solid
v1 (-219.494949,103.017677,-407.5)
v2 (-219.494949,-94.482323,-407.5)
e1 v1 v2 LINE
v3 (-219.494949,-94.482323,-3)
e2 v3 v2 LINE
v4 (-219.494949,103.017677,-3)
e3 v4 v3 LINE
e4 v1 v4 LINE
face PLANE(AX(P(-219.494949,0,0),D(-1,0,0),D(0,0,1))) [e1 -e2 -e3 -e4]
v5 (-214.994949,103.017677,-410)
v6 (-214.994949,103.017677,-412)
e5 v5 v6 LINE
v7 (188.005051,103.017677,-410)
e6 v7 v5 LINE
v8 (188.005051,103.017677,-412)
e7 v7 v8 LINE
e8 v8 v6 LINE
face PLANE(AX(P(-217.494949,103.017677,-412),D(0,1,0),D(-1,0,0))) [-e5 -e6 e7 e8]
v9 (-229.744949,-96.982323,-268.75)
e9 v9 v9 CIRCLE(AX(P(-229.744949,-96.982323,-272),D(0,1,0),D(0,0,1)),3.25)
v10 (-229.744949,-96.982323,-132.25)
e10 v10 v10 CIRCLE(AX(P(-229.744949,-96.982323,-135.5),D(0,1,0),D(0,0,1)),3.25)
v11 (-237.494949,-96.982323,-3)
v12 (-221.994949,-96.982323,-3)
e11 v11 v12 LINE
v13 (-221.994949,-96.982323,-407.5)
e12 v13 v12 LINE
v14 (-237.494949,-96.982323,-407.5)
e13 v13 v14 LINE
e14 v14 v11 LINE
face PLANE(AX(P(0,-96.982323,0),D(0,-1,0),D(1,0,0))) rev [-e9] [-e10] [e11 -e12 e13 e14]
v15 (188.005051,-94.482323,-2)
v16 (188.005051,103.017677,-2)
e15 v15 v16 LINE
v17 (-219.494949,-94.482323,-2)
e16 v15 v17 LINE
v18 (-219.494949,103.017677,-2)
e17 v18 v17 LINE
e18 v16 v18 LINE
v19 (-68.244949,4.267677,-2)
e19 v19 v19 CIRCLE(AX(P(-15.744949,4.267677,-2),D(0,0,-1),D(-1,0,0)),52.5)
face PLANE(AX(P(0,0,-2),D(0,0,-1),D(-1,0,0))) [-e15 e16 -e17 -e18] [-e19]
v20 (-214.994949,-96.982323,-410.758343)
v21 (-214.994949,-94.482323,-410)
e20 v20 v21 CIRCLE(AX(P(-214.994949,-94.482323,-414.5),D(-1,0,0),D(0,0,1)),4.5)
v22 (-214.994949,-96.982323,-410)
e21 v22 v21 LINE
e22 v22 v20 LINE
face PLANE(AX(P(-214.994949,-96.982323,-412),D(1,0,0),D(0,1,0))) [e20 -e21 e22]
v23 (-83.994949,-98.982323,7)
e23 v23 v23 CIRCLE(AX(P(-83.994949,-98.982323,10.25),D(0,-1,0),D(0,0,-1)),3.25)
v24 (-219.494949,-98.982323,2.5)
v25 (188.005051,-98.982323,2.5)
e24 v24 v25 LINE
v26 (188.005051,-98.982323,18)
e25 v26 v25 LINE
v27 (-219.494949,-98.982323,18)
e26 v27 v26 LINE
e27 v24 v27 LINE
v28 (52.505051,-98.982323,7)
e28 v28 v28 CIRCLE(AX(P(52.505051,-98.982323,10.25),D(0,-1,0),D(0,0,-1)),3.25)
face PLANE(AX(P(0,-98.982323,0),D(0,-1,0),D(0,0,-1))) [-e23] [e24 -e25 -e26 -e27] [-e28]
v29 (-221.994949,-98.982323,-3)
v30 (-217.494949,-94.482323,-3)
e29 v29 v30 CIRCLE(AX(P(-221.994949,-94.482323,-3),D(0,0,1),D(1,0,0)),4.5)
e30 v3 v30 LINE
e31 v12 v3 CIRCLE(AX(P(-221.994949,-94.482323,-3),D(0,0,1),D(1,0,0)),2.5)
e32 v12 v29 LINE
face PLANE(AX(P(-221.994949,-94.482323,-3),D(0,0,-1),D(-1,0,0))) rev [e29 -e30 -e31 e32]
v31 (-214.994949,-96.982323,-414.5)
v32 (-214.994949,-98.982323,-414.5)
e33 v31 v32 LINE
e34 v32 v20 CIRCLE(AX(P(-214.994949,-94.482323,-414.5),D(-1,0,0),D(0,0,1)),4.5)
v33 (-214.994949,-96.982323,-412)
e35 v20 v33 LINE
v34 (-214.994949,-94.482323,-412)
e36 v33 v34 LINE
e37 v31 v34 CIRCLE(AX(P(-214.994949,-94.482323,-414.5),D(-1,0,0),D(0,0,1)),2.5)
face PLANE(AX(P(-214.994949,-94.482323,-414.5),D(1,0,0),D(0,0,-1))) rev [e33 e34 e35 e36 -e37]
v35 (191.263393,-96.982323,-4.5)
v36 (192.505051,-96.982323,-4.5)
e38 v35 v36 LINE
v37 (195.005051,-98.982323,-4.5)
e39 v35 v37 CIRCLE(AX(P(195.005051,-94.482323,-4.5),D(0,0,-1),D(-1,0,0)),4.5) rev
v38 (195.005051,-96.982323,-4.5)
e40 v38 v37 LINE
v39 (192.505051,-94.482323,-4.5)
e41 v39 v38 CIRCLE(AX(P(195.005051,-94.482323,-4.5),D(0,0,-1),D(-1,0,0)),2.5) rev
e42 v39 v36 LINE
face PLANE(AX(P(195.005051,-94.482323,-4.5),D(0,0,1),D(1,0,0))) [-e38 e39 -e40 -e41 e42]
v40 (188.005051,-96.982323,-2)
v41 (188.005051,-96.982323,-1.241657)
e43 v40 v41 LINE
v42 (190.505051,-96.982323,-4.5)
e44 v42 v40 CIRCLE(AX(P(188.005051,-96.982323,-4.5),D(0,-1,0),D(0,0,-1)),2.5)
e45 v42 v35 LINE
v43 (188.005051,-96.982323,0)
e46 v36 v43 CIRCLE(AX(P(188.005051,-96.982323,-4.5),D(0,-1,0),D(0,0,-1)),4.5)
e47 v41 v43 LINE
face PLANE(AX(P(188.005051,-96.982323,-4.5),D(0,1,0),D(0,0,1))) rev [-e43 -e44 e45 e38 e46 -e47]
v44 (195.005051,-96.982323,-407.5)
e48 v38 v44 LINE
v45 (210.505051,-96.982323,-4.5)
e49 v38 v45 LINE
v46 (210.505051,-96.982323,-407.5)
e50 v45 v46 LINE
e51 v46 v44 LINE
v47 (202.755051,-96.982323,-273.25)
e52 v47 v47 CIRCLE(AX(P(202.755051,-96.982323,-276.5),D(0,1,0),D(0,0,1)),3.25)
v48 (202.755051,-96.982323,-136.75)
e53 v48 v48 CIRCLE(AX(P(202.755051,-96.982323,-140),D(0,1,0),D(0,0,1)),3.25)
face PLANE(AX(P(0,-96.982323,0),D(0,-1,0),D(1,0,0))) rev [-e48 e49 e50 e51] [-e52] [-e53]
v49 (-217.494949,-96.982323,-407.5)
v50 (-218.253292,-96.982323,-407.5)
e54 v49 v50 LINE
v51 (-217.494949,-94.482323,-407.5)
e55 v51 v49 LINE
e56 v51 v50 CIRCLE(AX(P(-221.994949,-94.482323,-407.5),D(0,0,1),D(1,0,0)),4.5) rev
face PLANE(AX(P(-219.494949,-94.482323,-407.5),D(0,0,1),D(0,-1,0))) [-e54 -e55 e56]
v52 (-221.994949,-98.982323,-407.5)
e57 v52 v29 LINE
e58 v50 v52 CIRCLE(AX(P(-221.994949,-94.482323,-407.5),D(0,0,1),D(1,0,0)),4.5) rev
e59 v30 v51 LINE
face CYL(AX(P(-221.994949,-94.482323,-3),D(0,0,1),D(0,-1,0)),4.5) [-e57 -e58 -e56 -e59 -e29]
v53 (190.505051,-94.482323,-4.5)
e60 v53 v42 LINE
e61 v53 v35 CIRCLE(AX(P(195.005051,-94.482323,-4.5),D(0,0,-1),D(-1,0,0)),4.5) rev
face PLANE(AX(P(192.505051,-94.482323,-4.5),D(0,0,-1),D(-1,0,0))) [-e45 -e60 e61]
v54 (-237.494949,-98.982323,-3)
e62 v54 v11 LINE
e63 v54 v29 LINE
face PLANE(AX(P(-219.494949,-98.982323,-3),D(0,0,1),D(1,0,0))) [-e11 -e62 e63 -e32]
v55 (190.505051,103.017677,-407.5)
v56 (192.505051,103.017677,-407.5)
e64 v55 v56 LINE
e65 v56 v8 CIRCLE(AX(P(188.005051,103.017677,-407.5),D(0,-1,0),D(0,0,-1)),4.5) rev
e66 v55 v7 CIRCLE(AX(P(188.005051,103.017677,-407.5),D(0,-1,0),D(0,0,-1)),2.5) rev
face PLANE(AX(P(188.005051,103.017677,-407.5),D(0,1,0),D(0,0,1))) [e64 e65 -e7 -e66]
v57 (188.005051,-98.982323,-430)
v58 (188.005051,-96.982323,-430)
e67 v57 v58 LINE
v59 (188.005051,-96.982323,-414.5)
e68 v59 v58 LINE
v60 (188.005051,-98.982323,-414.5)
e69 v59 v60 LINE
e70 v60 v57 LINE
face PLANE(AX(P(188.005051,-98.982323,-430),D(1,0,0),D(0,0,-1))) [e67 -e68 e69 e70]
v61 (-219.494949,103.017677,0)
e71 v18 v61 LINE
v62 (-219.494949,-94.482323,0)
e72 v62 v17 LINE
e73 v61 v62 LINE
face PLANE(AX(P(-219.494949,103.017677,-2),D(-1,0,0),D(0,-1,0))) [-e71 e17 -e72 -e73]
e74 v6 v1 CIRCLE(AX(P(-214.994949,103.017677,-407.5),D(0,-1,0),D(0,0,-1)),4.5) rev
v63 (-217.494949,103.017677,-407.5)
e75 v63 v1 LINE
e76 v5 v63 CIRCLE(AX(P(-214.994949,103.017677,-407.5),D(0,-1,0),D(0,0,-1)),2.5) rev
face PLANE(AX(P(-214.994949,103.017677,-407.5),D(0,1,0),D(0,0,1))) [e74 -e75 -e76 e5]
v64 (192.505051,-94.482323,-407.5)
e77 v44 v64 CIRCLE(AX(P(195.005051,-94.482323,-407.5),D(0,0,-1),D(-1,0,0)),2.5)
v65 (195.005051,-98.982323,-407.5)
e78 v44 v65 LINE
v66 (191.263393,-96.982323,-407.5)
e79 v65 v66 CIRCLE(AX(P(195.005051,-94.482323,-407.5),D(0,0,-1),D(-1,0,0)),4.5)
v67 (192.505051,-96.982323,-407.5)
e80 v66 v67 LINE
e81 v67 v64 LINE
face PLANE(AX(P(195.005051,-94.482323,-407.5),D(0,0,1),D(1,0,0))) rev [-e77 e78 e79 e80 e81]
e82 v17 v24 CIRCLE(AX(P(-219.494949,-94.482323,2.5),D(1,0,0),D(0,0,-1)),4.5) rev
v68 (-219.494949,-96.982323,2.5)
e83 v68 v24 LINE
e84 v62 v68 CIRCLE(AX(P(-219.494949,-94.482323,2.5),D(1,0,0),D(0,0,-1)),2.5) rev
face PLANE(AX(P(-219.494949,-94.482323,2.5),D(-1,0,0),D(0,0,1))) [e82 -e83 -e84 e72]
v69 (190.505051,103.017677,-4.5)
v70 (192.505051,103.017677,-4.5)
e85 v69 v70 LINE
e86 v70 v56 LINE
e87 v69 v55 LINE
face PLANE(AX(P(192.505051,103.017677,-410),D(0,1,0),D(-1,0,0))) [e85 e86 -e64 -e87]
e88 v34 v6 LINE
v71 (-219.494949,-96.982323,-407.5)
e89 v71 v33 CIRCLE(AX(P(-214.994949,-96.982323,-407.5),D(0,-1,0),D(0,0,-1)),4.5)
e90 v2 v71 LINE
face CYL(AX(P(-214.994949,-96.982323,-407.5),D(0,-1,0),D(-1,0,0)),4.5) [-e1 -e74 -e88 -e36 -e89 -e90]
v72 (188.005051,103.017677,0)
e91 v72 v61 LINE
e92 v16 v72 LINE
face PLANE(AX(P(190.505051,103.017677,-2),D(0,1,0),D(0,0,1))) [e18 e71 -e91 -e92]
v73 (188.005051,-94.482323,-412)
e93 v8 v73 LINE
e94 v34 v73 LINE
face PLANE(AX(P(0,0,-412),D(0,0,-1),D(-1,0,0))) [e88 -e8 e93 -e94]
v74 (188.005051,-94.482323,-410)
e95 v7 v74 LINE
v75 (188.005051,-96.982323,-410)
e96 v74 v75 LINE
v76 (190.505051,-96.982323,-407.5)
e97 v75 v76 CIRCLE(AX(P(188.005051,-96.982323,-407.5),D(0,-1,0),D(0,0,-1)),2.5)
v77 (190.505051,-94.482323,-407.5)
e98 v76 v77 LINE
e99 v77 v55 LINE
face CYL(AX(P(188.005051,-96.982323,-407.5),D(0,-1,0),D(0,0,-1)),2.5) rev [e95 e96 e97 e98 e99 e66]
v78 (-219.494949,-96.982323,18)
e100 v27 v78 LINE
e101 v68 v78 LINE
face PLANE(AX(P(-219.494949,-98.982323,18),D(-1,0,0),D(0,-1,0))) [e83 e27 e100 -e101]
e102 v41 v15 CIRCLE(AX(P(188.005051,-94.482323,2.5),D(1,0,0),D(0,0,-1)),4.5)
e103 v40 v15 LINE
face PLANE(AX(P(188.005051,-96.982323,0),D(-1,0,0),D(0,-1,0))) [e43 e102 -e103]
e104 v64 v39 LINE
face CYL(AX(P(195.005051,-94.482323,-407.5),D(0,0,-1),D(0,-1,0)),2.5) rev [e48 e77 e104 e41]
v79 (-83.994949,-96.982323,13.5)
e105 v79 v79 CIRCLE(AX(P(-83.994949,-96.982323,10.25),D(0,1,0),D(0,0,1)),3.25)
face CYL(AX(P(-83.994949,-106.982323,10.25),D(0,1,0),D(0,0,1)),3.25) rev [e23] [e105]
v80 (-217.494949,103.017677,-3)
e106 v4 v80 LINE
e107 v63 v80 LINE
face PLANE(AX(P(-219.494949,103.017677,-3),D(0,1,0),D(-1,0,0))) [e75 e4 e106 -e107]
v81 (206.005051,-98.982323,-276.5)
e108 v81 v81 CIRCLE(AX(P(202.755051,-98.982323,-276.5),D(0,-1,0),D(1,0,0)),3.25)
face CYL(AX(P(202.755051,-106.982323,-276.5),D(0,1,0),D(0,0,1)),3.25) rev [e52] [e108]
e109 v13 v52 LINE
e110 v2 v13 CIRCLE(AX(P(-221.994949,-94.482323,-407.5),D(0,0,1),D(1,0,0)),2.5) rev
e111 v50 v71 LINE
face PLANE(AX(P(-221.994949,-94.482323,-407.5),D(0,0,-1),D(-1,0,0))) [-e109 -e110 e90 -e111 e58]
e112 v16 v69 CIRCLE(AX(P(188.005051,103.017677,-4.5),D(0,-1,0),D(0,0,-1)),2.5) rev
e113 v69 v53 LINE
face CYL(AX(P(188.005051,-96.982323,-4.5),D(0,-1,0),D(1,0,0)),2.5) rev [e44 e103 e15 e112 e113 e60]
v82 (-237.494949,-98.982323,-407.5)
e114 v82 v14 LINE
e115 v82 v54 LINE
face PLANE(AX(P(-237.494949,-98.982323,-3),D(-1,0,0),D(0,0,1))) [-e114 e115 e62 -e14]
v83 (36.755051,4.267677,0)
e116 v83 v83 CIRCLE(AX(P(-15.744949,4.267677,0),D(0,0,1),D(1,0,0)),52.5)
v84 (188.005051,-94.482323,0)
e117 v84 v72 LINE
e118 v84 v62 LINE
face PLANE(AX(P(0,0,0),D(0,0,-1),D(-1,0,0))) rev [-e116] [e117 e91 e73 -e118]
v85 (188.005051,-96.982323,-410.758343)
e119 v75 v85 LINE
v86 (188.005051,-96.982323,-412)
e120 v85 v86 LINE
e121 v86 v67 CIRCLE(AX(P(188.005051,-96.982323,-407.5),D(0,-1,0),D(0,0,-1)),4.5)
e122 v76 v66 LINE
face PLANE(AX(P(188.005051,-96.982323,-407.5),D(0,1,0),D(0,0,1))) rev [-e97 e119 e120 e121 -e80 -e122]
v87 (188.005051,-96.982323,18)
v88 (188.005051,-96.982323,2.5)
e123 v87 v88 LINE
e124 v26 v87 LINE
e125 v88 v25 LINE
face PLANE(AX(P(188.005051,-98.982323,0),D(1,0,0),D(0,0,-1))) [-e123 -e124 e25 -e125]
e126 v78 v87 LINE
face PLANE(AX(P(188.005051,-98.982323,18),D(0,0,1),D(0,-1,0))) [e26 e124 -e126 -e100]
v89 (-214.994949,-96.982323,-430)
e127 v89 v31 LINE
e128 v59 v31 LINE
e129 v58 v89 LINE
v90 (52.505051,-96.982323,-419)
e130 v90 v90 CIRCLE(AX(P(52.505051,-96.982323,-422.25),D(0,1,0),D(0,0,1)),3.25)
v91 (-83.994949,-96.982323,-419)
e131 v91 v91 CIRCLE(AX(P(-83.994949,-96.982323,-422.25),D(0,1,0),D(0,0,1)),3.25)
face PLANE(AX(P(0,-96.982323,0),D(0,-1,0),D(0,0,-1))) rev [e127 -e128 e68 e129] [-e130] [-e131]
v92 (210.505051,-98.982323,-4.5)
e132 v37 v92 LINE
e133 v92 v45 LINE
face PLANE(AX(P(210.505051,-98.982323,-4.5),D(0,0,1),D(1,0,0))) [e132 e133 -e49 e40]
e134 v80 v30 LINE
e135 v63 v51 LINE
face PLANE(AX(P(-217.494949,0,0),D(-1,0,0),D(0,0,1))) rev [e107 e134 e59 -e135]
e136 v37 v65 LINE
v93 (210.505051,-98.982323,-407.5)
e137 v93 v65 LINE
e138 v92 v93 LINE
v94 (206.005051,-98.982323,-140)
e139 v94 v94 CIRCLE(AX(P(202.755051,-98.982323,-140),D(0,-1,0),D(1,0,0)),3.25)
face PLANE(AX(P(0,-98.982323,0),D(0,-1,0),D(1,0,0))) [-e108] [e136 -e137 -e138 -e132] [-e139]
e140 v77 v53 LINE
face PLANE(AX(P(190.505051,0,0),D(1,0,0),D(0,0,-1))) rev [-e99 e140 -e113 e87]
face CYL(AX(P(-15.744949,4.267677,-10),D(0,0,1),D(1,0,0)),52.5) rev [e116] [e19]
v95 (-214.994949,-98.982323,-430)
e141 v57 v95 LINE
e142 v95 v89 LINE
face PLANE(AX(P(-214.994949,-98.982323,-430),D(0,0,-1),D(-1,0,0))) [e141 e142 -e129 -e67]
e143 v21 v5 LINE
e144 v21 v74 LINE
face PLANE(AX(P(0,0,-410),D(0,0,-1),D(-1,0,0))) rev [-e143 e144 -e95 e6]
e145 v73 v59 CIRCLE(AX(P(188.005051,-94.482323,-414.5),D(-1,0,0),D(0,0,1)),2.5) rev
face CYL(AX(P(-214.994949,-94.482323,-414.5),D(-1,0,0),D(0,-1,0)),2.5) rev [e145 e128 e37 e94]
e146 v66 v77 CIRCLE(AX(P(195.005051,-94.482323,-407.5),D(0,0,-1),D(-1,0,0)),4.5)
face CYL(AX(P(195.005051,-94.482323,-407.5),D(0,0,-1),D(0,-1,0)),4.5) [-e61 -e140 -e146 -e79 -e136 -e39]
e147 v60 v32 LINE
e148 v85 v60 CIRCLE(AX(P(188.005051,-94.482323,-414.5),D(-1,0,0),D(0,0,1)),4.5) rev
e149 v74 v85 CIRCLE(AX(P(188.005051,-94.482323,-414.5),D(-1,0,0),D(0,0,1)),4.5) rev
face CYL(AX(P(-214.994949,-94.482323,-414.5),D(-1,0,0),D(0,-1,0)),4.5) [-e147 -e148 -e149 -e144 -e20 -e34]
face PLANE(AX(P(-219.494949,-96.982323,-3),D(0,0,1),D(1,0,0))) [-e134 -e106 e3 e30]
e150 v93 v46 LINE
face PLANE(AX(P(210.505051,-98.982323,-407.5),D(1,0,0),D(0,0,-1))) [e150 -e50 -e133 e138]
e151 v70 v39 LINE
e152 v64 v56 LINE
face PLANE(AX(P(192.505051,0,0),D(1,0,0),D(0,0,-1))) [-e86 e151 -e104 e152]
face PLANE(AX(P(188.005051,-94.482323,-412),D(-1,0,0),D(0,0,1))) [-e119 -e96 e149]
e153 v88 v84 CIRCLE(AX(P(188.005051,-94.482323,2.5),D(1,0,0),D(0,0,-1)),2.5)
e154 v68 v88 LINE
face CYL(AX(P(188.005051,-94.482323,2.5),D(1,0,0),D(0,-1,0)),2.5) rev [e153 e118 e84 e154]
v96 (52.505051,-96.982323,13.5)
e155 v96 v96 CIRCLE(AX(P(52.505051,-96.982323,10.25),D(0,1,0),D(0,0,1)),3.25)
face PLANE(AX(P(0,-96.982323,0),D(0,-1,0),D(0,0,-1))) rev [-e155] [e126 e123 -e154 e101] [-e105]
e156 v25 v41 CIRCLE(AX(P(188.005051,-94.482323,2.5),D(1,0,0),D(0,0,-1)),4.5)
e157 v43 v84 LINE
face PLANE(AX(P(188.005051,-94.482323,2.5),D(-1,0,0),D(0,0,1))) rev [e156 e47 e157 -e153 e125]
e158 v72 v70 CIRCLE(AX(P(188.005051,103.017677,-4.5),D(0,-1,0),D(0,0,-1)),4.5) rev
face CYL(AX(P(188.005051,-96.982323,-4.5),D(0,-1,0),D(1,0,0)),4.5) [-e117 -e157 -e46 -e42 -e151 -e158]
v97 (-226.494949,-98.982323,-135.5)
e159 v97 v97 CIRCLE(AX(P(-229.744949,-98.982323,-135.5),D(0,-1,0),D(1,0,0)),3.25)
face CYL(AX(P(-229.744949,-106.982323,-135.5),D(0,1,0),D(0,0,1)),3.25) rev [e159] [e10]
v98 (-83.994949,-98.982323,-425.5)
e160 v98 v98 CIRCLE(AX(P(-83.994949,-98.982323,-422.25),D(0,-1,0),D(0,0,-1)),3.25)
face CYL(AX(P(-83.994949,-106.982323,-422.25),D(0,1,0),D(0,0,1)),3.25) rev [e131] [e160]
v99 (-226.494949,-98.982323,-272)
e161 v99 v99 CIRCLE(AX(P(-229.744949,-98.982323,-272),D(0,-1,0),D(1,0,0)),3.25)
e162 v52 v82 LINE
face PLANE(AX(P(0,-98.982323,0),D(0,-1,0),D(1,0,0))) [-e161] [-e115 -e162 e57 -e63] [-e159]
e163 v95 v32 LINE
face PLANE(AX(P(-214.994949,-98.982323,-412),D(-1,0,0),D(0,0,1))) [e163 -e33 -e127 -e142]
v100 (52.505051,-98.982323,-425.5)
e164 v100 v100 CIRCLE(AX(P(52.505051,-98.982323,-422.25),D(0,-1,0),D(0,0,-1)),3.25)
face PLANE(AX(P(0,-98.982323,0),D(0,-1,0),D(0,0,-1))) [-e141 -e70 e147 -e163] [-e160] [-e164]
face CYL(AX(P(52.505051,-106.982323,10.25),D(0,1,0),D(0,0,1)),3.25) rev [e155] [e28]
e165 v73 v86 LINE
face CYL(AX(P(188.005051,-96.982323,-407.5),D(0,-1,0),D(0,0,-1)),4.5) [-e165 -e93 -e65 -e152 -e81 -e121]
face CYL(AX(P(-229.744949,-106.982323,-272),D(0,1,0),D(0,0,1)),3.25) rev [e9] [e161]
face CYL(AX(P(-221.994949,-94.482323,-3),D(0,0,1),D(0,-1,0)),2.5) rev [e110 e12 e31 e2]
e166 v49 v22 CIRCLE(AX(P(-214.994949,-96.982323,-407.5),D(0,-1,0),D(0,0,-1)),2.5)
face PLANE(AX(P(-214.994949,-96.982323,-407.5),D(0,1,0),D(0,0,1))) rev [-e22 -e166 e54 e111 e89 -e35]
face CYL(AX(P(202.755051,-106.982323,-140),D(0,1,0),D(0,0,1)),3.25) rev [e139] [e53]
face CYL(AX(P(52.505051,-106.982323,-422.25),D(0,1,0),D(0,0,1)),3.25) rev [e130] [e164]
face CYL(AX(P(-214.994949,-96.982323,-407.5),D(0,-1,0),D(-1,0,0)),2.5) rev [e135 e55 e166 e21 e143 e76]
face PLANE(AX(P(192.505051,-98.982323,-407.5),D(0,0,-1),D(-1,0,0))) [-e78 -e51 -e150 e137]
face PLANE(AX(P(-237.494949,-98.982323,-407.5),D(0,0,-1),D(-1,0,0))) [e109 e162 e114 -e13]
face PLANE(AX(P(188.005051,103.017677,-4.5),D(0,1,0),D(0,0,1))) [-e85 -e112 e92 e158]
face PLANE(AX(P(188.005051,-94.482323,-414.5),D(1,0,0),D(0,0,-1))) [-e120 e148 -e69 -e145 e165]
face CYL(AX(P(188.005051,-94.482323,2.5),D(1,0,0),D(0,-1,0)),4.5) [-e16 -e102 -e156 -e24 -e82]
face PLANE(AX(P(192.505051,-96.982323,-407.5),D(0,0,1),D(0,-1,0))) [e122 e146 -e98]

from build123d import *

# Parameters (mm, degrees)
SKETCH1_W                    = 410
SKETCH1_H                    = 200
BASE_FLANGE1_DEPTH           = 2
EDGE_FLANGE2_STRIP_W         = 13
EDGE_FLANGE2_STRIP_H         = 2
EDGE_FLANGE2_STRIP_CUT_DEPTH = 200
EDGE_FLANGE2_DEPTH           = 200
EDGE_FLANGE4_STRIP_W         = 13
EDGE_FLANGE4_STRIP_H         = 2
EDGE_FLANGE4_STRIP_CUT_DEPTH = 200
EDGE_FLANGE4_DEPTH           = 200
EDGE_FLANGE5_STRIP_W         = 13
EDGE_FLANGE5_STRIP_H         = 2
EDGE_FLANGE5_STRIP_CUT_DEPTH = 200
EDGE_FLANGE5_DEPTH           = 200
EDGE_FLANGE6_STRIP_W         = 13
EDGE_FLANGE6_STRIP_H         = 2
EDGE_FLANGE6_STRIP_CUT_DEPTH = 403
EDGE_FLANGE6_DEPTH           = 403
EDGE_FLANGE7_STRIP_W         = 13
EDGE_FLANGE7_STRIP_H         = 2
EDGE_FLANGE7_STRIP_CUT_DEPTH = 403
EDGE_FLANGE7_DEPTH           = 403
EDGE_FLANGE8_STRIP_W         = 13
EDGE_FLANGE8_STRIP_H         = 2
EDGE_FLANGE8_STRIP_CUT_DEPTH = 407.5
EDGE_FLANGE8_DEPTH           = 407.5
EDGE_FLANGE9_STRIP_W         = 13
EDGE_FLANGE9_STRIP_H         = 2
EDGE_FLANGE9_STRIP_CUT_DEPTH = 404.5
EDGE_FLANGE9_DEPTH           = 404.5
SKETCH29_R                   = 52.5
CUT_EXTRUDE1_DEPTH           = 10
SKETCH30_R                   = 3.25
CUT_EXTRUDE2_DEPTH           = 10


# Sheet-metal steps are written as plain solids
with BuildPart() as part:
    # Sketch1 → Base-Flange1 (new body)
    with BuildSketch(Plane.XY):
        with Locations((-14.494949495, 3.017676768)):
            Rectangle(SKETCH1_W, SKETCH1_H)
    extrude(amount=-BASE_FLANGE1_DEPTH)

    # Edge-Flange2 strip (across the edge) → Edge-Flange2 strip cut (cut)
    with BuildSketch(Plane(origin=(190.505050505, 103.017676768, -2), x_dir=(-1, 0, 0), z_dir=(0, -1, 0))):
        with Locations((-4, -1)):
            Rectangle(EDGE_FLANGE2_STRIP_W, EDGE_FLANGE2_STRIP_H)
    extrude(amount=EDGE_FLANGE2_STRIP_CUT_DEPTH, mode=Mode.SUBTRACT)

    # Edge-Flange2 section (across the edge) → Edge-Flange2 (add)
    with BuildSketch(Plane(origin=(190.505050505, 103.017676768, -2), x_dir=(-1, 0, 0), z_dir=(0, -1, 0))):
        with BuildLine():
            Line((-2, 2.5), (-2, 408))
            Line((-2, 408), (0, 408))
            Line((0, 408), (0, 2.5))
            ThreePointArc((0, 2.5), (0.732233047, 0.732233047), (2.5, 0))
            Line((2.5, 0), (2.5, -2))
            ThreePointArc((2.5, -2), (-0.681980515, -0.681980515), (-2, 2.5))
        make_face()
    extrude(amount=EDGE_FLANGE2_DEPTH)

    # Edge-Flange4 strip (across the edge) → Edge-Flange4 strip cut (cut)
    with BuildSketch(Plane(origin=(190.505050505, 103.017676768, -410), x_dir=(0, 0, 1), z_dir=(0, -1, 0))):
        with Locations((-4, -1)):
            Rectangle(EDGE_FLANGE4_STRIP_W, EDGE_FLANGE4_STRIP_H)
    extrude(amount=EDGE_FLANGE4_STRIP_CUT_DEPTH, mode=Mode.SUBTRACT)

    # Edge-Flange4 section (across the edge) → Edge-Flange4 (add)
    with BuildSketch(Plane(origin=(190.505050505, 103.017676768, -410), x_dir=(0, 0, 1), z_dir=(0, -1, 0))):
        with BuildLine():
            Line((-2, 2.5), (-2, 408))
            Line((-2, 408), (0, 408))
            Line((0, 408), (0, 2.5))
            ThreePointArc((0, 2.5), (0.732233047, 0.732233047), (2.5, 0))
            Line((2.5, 0), (2.5, -2))
            ThreePointArc((2.5, -2), (-0.681980515, -0.681980515), (-2, 2.5))
        make_face()
    extrude(amount=EDGE_FLANGE4_DEPTH)

    # Edge-Flange5 strip (across the edge) → Edge-Flange5 strip cut (cut)
    with BuildSketch(Plane(origin=(-217.494949495, 103.017676768, -410), x_dir=(1, 0, 0), z_dir=(0, -1, 0))):
        with Locations((-4, -1)):
            Rectangle(EDGE_FLANGE5_STRIP_W, EDGE_FLANGE5_STRIP_H)
    extrude(amount=EDGE_FLANGE5_STRIP_CUT_DEPTH, mode=Mode.SUBTRACT)

    # Edge-Flange5 section (across the edge) → Edge-Flange5 (add)
    with BuildSketch(Plane(origin=(-217.494949495, 103.017676768, -410), x_dir=(1, 0, 0), z_dir=(0, -1, 0))):
        with BuildLine():
            Line((-2, 2.5), (-2, 407))
            Line((-2, 407), (0, 407))
            Line((0, 407), (0, 2.5))
            ThreePointArc((0, 2.5), (0.732233047, 0.732233047), (2.5, 0))
            Line((2.5, 0), (2.5, -2))
            ThreePointArc((2.5, -2), (-0.681980515, -0.681980515), (-2, 2.5))
        make_face()
    extrude(amount=EDGE_FLANGE5_DEPTH)

    # Edge-Flange6 strip (across the edge) → Edge-Flange6 strip cut (cut)
    with BuildSketch(Plane(origin=(188.005050505, -96.982323232, -412), x_dir=(0, 1, 0), z_dir=(-1, 0, 0))):
        with Locations((-4, -1)):
            Rectangle(EDGE_FLANGE6_STRIP_W, EDGE_FLANGE6_STRIP_H)
    extrude(amount=EDGE_FLANGE6_STRIP_CUT_DEPTH, mode=Mode.SUBTRACT)

    # Edge-Flange6 section (across the edge) → Edge-Flange6 (add)
    with BuildSketch(Plane(origin=(188.005050505, -96.982323232, -412), x_dir=(0, 1, 0), z_dir=(-1, 0, 0))):
        with BuildLine():
            Line((-2, 2.5), (-2, 18))
            Line((-2, 18), (0, 18))
            Line((0, 18), (0, 2.5))
            ThreePointArc((0, 2.5), (0.732233047, 0.732233047), (2.5, 0))
            Line((2.5, 0), (2.5, -2))
            ThreePointArc((2.5, -2), (-0.681980515, -0.681980515), (-2, 2.5))
        make_face()
    extrude(amount=EDGE_FLANGE6_DEPTH)

    # Edge-Flange7 strip (across the edge) → Edge-Flange7 strip cut (cut)
    with BuildSketch(Plane(origin=(192.505050505, -96.982323232, -4.5), x_dir=(0, 1, 0), z_dir=(0, 0, -1))):
        with Locations((-4, -1)):
            Rectangle(EDGE_FLANGE7_STRIP_W, EDGE_FLANGE7_STRIP_H)
    extrude(amount=EDGE_FLANGE7_STRIP_CUT_DEPTH, mode=Mode.SUBTRACT)

    # Edge-Flange7 section (across the edge) → Edge-Flange7 (add)
    with BuildSketch(Plane(origin=(192.505050505, -96.982323232, -4.5), x_dir=(0, 1, 0), z_dir=(0, 0, -1))):
        with BuildLine():
            Line((-2, 2.5), (-2, 18))
            Line((-2, 18), (0, 18))
            Line((0, 18), (0, 2.5))
            ThreePointArc((0, 2.5), (0.732233047, 0.732233047), (2.5, 0))
            Line((2.5, 0), (2.5, -2))
            ThreePointArc((2.5, -2), (-0.681980515, -0.681980515), (-2, 2.5))
        make_face()
    extrude(amount=EDGE_FLANGE7_DEPTH)

    # Edge-Flange8 strip (across the edge) → Edge-Flange8 strip cut (cut)
    with BuildSketch(Plane(origin=(-219.494949495, -96.982323232, 0), x_dir=(0, 1, 0), z_dir=(1, 0, 0))):
        with Locations((-4, -1)):
            Rectangle(EDGE_FLANGE8_STRIP_W, EDGE_FLANGE8_STRIP_H)
    extrude(amount=EDGE_FLANGE8_STRIP_CUT_DEPTH, mode=Mode.SUBTRACT)

    # Edge-Flange8 section (across the edge) → Edge-Flange8 (add)
    with BuildSketch(Plane(origin=(-219.494949495, -96.982323232, 0), x_dir=(0, 1, 0), z_dir=(1, 0, 0))):
        with BuildLine():
            Line((-2, 2.5), (-2, 18))
            Line((-2, 18), (0, 18))
            Line((0, 18), (0, 2.5))
            ThreePointArc((0, 2.5), (0.732233047, 0.732233047), (2.5, 0))
            Line((2.5, 0), (2.5, -2))
            ThreePointArc((2.5, -2), (-0.681980515, -0.681980515), (-2, 2.5))
        make_face()
    extrude(amount=EDGE_FLANGE8_DEPTH)

    # Edge-Flange9 strip (across the edge) → Edge-Flange9 strip cut (cut)
    with BuildSketch(Plane(origin=(-219.494949495, -96.982323232, -407.5), x_dir=(0, 1, 0), z_dir=(0, 0, 1))):
        with Locations((-4, -1)):
            Rectangle(EDGE_FLANGE9_STRIP_W, EDGE_FLANGE9_STRIP_H)
    extrude(amount=EDGE_FLANGE9_STRIP_CUT_DEPTH, mode=Mode.SUBTRACT)

    # Edge-Flange9 section (across the edge) → Edge-Flange9 (add)
    with BuildSketch(Plane(origin=(-219.494949495, -96.982323232, -407.5), x_dir=(0, 1, 0), z_dir=(0, 0, 1))):
        with BuildLine():
            Line((-2, 2.5), (-2, 18))
            Line((-2, 18), (0, 18))
            Line((0, 18), (0, 2.5))
            ThreePointArc((0, 2.5), (0.732233047, 0.732233047), (2.5, 0))
            Line((2.5, 0), (2.5, -2))
            ThreePointArc((2.5, -2), (-0.681980515, -0.681980515), (-2, 2.5))
        make_face()
    extrude(amount=EDGE_FLANGE9_DEPTH)

    # Sketch29 → Cut-Extrude1 (cut)
    with BuildSketch(Plane.XY):
        with Locations((-15.744949495, 4.267676768)):
            Circle(SKETCH29_R)
    extrude(amount=-CUT_EXTRUDE1_DEPTH, mode=Mode.SUBTRACT)

    # Sketch30 → Cut-Extrude2 (cut)
    with BuildSketch(Plane(origin=(0, -96.982323232, 0), x_dir=(1, 0, 0), z_dir=(0, 1, 0))):
        with Locations(Location((-83.994949495, -10.25, 0), (0, 0, 270))):
            Circle(SKETCH30_R)
        with Locations(Location((52.505050505, -10.25, 0), (0, 0, 270))):
            Circle(SKETCH30_R)
        with Locations(Location((202.755050505, 140, 0), (0, 0, 270))):
            Circle(SKETCH30_R)
        with Locations(Location((202.755050505, 276.5, 0), (0, 0, 270))):
            Circle(SKETCH30_R)
        with Locations(Location((52.505050505, 422.25, 0), (0, 0, 270))):
            Circle(SKETCH30_R)
        with Locations(Location((-83.994949495, 422.25, 0), (0, 0, 270))):
            Circle(SKETCH30_R)
        with Locations(Location((-229.744949495, 272, 0), (0, 0, 270))):
            Circle(SKETCH30_R)
        with Locations(Location((-229.744949495, 135.5, 0), (0, 0, 270))):
            Circle(SKETCH30_R)
    extrude(amount=-CUT_EXTRUDE2_DEPTH, mode=Mode.SUBTRACT)


solid = part.part
